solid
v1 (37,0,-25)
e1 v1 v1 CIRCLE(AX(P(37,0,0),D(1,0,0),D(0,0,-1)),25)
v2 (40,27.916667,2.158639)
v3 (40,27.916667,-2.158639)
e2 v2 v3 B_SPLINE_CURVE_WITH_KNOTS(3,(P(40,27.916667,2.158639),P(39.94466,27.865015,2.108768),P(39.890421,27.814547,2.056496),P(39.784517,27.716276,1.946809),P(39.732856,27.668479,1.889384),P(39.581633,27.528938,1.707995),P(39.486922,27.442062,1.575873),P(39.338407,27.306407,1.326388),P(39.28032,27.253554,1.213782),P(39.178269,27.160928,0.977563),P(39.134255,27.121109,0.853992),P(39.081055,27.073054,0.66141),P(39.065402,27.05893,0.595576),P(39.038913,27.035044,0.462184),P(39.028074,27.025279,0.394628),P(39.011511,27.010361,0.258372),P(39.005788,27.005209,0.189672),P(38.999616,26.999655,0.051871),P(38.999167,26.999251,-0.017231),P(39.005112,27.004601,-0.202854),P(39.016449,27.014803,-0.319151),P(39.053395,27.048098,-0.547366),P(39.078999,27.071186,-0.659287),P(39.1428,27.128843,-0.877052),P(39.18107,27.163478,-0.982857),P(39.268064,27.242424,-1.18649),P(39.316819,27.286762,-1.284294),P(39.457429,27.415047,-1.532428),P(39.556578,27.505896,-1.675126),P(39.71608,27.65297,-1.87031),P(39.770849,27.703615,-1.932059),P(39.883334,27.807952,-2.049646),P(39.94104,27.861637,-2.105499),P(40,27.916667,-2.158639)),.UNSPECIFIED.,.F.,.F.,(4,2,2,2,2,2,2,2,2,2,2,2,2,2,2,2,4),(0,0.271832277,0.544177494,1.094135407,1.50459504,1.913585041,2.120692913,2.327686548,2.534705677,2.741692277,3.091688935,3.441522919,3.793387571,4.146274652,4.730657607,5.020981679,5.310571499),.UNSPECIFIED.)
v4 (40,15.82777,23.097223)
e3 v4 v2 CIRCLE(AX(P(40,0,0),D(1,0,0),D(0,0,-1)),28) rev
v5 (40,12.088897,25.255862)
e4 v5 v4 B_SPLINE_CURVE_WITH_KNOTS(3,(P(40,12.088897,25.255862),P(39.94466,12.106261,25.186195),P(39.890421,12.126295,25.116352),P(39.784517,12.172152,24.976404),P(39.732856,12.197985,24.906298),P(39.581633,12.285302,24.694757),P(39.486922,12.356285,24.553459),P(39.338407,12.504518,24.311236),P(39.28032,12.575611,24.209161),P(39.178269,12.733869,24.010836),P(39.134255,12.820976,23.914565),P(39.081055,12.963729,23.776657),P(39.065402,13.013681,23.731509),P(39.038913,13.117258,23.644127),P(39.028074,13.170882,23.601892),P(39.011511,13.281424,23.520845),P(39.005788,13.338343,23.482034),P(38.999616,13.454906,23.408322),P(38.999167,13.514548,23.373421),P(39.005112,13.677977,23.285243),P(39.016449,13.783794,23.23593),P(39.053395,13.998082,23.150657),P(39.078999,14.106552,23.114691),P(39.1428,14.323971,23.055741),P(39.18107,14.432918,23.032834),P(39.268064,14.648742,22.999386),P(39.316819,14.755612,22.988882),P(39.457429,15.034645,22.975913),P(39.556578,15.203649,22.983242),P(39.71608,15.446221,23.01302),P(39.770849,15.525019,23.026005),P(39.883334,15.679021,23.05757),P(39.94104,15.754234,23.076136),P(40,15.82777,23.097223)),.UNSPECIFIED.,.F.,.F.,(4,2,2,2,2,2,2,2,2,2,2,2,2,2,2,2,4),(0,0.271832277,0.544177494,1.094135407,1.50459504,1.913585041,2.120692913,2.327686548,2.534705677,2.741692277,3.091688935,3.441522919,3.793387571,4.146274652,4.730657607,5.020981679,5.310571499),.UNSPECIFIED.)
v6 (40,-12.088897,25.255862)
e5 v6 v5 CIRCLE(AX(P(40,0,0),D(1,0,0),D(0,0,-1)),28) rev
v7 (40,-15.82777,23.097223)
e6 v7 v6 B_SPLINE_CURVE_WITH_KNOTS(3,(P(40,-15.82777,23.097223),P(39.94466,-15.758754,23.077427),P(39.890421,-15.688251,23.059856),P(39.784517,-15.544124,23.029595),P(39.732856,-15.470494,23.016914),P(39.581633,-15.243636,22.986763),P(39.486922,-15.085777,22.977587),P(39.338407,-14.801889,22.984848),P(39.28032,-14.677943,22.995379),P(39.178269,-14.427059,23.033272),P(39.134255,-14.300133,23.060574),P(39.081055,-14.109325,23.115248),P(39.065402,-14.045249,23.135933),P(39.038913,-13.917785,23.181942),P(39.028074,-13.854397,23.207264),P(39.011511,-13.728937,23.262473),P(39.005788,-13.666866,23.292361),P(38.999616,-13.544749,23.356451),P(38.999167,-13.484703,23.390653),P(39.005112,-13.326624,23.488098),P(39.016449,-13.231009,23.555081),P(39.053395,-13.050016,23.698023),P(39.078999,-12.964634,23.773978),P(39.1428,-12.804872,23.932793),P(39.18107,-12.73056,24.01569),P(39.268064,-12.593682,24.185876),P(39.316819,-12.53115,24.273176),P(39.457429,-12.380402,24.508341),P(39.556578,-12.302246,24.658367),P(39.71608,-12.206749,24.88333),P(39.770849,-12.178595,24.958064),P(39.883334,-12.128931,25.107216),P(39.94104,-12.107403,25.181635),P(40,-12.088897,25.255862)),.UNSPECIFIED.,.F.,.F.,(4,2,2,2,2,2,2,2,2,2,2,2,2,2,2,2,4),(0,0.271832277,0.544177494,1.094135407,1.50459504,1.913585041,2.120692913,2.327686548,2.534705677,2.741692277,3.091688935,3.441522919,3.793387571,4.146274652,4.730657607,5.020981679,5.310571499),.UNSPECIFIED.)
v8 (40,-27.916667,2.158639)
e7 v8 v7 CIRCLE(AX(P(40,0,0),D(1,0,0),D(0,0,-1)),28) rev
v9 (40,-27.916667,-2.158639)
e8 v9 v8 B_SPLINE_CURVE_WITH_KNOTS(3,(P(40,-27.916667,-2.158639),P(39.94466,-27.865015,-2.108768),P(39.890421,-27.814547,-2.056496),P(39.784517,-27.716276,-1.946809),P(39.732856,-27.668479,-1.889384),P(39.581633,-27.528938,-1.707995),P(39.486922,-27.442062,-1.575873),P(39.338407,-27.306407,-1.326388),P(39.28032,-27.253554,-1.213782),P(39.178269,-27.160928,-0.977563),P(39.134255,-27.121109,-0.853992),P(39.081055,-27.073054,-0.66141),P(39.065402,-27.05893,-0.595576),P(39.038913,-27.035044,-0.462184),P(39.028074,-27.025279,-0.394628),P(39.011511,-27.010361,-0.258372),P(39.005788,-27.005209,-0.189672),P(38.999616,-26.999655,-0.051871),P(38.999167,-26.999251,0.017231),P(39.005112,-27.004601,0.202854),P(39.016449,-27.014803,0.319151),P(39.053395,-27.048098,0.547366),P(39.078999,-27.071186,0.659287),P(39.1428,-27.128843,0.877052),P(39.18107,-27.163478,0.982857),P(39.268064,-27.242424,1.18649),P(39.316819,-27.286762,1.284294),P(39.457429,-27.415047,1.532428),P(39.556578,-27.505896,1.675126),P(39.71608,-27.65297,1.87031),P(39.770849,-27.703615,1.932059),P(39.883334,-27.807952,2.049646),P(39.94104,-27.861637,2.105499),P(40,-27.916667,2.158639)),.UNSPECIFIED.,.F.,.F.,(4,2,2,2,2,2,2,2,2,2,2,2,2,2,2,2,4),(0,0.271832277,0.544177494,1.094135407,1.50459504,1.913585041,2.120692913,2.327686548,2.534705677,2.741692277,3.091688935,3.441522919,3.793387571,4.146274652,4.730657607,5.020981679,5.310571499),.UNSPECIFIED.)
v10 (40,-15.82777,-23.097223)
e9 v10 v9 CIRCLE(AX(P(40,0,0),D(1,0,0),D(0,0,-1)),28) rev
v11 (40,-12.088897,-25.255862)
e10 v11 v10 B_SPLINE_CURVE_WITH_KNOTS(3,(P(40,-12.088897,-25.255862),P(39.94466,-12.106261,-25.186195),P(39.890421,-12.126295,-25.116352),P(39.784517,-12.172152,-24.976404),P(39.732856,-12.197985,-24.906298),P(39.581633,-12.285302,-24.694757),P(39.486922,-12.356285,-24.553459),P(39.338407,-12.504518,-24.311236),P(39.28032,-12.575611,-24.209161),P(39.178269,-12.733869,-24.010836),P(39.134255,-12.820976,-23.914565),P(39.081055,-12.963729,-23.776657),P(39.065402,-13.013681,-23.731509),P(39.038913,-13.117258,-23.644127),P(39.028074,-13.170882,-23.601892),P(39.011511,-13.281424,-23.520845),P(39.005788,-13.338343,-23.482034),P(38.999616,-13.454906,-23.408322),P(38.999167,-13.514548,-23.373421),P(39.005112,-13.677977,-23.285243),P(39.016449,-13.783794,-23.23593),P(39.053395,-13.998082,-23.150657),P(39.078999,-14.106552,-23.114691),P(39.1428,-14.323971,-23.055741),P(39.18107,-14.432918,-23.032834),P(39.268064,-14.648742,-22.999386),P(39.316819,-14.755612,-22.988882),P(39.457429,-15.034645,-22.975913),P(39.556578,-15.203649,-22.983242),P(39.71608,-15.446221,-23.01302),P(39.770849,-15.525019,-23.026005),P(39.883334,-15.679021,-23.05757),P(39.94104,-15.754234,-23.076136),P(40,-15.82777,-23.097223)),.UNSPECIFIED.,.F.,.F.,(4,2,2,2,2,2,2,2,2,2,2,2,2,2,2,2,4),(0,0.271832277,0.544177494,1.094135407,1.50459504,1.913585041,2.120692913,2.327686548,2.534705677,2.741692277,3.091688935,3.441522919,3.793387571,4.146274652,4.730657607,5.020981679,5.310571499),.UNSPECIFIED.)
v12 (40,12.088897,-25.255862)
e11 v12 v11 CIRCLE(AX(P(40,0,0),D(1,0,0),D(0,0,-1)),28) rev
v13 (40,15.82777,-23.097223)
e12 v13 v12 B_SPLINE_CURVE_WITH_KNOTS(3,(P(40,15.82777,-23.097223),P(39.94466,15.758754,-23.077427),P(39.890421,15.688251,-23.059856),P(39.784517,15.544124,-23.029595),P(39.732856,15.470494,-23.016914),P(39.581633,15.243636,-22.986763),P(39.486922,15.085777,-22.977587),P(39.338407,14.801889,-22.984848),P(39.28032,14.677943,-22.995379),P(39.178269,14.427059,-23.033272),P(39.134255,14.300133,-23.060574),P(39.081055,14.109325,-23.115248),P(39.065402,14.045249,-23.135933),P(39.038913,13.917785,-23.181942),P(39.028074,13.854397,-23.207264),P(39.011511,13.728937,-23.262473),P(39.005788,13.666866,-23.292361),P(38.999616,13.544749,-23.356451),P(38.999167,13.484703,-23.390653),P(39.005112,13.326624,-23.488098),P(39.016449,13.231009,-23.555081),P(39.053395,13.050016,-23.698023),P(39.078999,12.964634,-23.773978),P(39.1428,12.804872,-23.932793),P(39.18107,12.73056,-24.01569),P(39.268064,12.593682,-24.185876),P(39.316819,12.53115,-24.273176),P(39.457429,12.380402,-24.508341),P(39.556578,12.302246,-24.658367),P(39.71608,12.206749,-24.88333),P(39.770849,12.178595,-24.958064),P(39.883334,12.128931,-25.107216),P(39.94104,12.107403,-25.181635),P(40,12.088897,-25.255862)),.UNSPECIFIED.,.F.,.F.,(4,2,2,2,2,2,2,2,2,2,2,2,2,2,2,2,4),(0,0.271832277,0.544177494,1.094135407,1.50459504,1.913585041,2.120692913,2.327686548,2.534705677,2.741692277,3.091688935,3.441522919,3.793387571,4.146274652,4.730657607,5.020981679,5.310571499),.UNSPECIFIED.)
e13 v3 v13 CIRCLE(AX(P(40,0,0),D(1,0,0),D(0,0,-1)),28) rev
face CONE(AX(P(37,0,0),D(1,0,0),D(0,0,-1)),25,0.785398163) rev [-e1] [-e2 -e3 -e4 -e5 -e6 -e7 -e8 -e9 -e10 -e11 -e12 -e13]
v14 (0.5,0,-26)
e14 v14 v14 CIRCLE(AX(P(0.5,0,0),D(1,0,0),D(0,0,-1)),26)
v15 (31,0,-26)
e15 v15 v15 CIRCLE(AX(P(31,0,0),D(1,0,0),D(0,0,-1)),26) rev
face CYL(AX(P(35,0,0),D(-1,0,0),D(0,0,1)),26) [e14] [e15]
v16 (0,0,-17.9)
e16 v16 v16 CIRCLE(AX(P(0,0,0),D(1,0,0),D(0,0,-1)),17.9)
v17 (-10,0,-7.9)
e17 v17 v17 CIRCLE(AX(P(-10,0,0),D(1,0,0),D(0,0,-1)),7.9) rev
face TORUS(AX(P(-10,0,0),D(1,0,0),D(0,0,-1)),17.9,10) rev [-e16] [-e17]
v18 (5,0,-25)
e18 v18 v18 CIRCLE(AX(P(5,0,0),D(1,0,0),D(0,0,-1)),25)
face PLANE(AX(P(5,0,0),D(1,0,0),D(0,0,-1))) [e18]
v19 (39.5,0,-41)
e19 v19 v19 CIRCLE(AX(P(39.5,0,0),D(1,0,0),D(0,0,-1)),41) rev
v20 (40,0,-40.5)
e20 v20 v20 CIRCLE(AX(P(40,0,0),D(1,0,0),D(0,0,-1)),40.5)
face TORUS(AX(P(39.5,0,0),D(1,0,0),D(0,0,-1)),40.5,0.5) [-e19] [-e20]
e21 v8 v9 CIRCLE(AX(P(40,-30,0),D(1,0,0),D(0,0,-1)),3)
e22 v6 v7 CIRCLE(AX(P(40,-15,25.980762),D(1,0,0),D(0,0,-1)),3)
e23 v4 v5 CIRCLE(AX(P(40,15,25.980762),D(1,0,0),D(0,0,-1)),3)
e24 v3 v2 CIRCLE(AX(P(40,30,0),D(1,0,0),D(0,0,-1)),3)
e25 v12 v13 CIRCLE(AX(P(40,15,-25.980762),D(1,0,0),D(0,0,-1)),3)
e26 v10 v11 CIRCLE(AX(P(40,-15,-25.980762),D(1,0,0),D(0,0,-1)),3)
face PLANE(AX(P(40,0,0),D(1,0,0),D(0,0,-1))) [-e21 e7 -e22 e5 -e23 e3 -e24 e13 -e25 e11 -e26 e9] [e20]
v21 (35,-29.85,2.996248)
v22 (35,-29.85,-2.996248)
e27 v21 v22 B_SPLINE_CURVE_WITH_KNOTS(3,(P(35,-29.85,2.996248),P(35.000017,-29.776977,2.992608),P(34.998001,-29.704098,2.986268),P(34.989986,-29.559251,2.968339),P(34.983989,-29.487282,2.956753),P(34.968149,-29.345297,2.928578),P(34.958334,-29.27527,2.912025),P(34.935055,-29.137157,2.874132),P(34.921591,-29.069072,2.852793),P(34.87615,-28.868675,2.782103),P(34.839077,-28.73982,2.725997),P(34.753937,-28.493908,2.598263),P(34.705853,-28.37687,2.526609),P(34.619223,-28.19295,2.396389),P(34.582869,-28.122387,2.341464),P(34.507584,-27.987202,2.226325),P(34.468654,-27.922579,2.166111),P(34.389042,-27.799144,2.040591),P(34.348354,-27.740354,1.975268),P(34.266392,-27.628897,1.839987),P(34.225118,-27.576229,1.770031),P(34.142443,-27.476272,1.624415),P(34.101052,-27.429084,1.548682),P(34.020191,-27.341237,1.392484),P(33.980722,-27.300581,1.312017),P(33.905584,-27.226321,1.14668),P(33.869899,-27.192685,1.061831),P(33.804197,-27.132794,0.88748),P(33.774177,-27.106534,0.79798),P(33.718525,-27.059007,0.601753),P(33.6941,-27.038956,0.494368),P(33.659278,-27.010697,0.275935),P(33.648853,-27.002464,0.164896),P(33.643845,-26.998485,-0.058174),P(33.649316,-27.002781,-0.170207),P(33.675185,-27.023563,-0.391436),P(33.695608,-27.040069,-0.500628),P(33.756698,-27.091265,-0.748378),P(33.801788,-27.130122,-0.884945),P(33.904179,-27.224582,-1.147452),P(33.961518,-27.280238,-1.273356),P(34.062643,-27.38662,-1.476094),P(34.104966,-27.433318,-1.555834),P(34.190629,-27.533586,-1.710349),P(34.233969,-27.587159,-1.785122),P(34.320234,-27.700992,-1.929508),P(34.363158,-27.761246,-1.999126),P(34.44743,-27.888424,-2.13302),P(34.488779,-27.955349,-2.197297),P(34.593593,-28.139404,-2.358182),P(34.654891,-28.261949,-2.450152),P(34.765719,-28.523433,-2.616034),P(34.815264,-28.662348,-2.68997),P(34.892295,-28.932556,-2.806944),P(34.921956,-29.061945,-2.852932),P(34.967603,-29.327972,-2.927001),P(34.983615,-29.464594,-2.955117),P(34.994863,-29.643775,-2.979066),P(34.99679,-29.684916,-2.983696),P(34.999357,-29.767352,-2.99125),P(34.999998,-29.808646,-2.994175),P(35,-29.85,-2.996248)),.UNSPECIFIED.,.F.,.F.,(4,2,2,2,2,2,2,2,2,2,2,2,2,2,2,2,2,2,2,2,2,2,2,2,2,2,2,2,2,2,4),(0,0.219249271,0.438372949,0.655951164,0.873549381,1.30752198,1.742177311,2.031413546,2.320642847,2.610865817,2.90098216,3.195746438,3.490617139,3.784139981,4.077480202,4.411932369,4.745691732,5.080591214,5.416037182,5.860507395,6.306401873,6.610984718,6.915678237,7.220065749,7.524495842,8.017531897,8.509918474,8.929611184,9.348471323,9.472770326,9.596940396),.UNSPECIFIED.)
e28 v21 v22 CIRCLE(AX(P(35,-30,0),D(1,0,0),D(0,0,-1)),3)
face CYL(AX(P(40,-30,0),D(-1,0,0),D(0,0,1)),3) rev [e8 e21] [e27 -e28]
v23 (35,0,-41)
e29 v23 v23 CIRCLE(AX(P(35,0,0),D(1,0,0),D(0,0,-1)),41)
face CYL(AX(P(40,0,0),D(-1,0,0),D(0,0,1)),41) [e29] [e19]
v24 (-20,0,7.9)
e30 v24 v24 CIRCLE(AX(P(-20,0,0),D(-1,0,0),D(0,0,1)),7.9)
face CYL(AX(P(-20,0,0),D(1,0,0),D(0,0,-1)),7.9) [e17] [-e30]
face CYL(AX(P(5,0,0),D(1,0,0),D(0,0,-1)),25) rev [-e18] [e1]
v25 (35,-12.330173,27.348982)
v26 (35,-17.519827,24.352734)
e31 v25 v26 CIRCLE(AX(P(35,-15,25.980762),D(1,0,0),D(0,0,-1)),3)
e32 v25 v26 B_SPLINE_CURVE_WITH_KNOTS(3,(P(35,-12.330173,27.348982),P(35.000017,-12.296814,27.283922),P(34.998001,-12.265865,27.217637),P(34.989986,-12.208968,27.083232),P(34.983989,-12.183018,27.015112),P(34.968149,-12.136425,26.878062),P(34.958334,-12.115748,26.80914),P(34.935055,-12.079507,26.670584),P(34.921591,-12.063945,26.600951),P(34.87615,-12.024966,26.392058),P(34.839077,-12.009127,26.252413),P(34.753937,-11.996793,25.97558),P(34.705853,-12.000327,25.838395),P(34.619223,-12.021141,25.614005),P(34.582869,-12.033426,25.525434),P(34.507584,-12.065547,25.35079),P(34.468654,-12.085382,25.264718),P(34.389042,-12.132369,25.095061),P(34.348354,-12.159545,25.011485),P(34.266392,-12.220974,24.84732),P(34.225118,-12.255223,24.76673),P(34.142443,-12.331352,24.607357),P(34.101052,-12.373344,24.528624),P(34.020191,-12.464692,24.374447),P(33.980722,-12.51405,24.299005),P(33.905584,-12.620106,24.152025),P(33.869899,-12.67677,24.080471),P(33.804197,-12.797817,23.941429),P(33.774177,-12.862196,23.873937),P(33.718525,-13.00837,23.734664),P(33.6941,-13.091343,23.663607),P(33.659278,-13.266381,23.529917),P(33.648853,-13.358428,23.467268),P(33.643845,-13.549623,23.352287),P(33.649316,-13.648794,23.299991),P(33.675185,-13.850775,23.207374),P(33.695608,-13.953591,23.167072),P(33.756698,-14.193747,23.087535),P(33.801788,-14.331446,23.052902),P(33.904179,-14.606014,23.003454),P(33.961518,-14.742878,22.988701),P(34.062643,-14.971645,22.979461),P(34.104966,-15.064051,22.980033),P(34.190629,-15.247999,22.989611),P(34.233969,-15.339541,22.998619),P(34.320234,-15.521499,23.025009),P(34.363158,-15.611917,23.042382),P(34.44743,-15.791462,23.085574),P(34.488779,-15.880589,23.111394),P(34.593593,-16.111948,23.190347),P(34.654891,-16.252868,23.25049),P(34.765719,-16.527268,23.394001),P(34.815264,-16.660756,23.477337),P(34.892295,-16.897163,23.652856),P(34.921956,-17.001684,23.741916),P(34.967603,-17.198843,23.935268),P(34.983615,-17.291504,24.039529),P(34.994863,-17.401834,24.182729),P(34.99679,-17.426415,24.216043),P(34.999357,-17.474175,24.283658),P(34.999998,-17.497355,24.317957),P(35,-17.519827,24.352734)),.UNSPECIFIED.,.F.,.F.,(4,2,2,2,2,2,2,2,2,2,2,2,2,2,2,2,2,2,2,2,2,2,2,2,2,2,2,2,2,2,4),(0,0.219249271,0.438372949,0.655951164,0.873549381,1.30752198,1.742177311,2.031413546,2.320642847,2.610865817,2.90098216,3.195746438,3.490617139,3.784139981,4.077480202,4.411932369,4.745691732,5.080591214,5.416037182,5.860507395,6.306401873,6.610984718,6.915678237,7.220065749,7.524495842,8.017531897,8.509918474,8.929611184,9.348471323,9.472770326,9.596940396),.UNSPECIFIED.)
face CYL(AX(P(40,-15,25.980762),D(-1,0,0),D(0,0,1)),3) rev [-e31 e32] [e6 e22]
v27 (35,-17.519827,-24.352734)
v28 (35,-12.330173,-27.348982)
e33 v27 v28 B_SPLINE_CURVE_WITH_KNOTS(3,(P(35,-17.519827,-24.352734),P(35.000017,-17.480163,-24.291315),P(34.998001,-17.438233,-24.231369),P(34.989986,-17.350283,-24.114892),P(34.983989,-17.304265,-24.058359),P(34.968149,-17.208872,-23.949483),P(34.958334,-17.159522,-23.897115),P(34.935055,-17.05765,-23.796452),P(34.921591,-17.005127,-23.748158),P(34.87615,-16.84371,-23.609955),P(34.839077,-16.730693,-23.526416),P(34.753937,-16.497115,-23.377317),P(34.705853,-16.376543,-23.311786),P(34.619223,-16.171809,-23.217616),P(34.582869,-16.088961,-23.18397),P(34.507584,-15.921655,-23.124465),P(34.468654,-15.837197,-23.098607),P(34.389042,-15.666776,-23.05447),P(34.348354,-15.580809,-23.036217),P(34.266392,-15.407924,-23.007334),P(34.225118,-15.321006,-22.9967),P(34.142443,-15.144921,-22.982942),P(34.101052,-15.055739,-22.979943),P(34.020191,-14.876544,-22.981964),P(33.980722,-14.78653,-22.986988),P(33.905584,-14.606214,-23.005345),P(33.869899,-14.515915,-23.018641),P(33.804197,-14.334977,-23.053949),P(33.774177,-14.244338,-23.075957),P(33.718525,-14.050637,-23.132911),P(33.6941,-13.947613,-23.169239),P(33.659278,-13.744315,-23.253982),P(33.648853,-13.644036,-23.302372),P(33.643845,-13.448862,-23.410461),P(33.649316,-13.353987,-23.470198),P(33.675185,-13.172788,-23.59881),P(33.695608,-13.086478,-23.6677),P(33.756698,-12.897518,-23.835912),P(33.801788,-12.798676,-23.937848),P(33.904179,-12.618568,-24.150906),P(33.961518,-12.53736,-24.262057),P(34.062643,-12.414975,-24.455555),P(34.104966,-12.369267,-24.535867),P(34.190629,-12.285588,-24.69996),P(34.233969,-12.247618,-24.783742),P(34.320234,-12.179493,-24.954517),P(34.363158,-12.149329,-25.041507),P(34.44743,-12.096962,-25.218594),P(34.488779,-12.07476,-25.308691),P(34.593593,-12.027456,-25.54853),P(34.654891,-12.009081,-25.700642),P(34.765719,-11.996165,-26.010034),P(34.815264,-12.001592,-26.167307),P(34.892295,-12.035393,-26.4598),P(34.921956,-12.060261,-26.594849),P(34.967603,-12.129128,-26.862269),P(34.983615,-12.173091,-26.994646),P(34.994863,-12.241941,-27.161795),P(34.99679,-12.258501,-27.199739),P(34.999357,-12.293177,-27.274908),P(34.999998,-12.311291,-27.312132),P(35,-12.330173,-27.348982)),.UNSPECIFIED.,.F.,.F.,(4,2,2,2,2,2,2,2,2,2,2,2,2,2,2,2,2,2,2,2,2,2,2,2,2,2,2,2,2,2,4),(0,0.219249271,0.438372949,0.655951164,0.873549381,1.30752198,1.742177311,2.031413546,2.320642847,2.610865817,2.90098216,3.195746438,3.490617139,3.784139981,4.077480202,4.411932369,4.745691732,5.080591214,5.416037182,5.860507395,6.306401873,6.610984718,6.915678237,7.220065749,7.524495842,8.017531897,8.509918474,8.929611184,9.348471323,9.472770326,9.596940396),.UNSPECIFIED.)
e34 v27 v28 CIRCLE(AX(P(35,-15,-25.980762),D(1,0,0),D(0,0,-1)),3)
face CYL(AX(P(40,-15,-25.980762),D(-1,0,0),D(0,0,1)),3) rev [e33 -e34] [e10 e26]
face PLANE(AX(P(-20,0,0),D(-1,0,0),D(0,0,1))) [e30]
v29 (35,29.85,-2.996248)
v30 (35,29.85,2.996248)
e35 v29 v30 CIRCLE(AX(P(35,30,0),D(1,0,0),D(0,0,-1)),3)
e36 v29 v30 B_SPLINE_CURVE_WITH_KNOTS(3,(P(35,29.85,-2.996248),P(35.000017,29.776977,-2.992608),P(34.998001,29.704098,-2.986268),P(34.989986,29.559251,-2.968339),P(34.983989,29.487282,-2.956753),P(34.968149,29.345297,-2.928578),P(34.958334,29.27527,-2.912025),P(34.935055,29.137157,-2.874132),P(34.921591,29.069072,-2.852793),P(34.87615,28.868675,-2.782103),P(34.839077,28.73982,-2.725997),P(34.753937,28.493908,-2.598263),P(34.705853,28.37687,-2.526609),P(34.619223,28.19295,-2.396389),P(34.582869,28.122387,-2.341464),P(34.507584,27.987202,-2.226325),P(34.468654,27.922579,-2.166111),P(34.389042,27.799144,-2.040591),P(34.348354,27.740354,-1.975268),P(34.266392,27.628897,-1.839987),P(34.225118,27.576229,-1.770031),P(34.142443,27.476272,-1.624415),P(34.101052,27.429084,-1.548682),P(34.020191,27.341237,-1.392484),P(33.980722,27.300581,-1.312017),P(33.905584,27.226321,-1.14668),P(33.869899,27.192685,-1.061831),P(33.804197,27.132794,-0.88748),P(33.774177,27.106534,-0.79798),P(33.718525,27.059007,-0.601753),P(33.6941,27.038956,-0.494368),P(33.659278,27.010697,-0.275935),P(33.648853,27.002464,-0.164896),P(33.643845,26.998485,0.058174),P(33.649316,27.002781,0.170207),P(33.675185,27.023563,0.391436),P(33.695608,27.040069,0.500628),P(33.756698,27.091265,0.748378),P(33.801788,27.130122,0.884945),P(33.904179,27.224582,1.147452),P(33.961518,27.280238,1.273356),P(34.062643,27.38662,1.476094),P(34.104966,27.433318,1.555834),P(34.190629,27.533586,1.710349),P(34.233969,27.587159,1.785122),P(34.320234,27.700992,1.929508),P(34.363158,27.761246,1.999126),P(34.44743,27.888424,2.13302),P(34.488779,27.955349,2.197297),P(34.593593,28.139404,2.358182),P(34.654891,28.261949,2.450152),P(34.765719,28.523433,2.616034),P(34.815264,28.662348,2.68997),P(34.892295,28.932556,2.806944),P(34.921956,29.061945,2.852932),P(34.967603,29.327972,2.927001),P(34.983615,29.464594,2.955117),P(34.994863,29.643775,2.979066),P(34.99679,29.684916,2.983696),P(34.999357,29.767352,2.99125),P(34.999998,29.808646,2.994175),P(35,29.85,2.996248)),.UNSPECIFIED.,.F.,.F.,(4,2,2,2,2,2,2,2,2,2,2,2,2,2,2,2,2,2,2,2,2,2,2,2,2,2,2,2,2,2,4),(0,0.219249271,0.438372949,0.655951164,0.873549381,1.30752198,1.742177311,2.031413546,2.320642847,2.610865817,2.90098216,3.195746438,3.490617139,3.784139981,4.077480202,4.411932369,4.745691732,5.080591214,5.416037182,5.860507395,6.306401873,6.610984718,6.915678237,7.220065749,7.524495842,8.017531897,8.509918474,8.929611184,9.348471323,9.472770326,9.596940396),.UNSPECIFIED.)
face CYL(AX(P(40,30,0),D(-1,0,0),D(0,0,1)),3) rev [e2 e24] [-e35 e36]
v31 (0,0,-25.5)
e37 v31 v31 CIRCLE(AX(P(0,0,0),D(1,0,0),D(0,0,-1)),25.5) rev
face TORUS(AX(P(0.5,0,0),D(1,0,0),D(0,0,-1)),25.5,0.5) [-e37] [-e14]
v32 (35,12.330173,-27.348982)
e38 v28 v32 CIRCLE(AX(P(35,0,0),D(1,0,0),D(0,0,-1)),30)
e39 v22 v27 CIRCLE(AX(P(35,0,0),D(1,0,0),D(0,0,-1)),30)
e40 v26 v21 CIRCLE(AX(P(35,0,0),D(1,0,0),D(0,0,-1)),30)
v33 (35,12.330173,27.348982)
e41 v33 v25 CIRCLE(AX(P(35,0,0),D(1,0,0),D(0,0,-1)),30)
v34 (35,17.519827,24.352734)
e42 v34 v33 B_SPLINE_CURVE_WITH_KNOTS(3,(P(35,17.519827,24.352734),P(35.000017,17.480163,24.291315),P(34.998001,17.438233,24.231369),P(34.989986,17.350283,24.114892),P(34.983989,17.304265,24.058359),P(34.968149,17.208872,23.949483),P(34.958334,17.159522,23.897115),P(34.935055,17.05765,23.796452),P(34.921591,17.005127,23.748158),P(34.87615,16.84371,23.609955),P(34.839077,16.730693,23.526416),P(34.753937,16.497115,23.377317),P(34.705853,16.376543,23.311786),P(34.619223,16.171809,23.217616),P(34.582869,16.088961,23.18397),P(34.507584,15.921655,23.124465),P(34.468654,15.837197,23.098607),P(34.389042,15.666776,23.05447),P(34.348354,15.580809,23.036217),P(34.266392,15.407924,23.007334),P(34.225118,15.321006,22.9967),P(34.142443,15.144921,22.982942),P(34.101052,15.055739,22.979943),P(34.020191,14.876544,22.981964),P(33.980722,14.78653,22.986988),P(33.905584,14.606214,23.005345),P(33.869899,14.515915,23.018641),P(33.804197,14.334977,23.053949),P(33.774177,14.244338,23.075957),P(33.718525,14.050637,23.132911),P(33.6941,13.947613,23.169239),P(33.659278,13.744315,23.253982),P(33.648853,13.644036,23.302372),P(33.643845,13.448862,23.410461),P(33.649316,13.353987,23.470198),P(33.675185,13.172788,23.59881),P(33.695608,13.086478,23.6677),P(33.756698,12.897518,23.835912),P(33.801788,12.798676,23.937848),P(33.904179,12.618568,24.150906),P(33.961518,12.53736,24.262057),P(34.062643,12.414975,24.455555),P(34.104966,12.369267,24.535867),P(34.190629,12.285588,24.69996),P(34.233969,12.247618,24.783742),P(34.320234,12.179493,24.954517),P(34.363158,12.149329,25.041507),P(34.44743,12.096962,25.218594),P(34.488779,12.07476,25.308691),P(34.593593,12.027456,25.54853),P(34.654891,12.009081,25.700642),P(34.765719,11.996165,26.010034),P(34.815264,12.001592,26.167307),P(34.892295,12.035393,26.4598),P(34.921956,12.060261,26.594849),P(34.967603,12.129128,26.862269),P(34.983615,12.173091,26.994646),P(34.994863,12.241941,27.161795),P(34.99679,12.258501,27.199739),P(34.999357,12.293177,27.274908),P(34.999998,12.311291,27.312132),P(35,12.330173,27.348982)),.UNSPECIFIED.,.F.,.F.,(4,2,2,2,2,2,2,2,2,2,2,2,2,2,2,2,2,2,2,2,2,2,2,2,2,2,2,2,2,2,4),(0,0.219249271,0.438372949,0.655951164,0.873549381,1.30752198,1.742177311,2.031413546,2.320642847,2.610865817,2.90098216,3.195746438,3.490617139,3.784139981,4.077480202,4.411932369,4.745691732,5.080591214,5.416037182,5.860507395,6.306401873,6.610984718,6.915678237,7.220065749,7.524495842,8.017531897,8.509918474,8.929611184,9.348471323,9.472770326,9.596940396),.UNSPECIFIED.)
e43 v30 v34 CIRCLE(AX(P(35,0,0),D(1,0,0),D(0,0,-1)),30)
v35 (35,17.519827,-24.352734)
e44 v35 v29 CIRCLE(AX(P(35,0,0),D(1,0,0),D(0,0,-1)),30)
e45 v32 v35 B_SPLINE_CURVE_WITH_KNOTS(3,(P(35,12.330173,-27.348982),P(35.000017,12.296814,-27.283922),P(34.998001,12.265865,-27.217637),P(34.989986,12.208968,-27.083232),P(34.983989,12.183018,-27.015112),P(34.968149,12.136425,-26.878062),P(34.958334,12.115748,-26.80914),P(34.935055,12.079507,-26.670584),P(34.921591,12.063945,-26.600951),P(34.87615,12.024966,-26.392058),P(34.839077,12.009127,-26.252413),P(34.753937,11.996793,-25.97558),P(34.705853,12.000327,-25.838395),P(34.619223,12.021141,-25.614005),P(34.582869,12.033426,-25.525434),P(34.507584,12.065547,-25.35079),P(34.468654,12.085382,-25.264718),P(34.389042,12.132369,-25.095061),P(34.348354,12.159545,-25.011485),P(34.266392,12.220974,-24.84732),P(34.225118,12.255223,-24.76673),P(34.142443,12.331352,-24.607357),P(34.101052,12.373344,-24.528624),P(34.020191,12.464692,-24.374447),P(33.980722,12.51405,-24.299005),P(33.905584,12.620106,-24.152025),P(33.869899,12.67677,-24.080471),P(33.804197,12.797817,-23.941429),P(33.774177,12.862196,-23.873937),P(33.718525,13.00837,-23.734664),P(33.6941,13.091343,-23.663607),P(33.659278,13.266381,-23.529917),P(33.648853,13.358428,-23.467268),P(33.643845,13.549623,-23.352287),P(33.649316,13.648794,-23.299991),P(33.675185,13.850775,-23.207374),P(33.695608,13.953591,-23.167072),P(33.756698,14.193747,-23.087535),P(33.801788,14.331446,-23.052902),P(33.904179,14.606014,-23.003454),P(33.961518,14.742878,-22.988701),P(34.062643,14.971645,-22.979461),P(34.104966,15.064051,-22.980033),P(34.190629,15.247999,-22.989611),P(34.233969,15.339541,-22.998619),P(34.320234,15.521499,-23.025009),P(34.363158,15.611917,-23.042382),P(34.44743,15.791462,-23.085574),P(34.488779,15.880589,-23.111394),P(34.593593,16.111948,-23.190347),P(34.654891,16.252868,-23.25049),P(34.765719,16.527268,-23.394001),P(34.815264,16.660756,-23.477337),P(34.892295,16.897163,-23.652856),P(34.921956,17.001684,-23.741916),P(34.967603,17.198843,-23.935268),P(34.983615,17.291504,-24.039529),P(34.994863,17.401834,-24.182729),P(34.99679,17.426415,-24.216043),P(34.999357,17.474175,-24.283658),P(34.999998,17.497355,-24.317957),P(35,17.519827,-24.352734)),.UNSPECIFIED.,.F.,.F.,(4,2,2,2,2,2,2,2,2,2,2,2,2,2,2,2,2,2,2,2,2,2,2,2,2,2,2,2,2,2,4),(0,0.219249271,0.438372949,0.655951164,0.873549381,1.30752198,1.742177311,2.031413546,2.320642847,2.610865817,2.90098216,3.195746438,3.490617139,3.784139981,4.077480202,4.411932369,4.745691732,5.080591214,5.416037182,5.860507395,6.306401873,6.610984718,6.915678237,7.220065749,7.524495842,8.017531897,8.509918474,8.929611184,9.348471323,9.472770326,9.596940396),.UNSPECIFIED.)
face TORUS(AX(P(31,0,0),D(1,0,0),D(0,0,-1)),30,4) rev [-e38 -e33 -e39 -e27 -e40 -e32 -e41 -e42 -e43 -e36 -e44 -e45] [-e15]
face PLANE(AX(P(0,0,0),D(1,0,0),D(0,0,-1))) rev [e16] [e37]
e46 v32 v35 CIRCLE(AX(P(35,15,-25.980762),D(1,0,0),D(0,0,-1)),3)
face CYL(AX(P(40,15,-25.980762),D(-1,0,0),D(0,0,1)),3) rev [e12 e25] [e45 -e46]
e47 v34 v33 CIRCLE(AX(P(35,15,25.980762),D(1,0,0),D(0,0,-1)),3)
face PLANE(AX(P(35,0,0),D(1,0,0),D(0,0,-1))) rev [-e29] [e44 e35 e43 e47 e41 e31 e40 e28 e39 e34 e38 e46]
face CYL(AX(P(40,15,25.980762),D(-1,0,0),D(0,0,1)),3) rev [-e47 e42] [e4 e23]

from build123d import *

# Parameters (mm, degrees)
SKETCH1_R           = 41
SKETCH1_R_2         = 3
BOSS_EXTRUDE1_DEPTH = 40
SKETCH2_R           = 7.9
BOSS_EXTRUDE2_DEPTH = 20
FILLET1_R           = 10
FILLET2_R           = 0.5
SKETCH3_R           = 57.838297584
SKETCH3_R_2         = 26
CUT_EXTRUDE1_DEPTH  = 35
FILLET3_R           = 4
FILLET4_R           = 0.5
SKETCH5_R           = 25
CUT_EXTRUDE2_DEPTH  = 35
CHAMFER1_SIZE       = 3


with BuildPart() as part:
    # Sketch1 → Boss-Extrude1 (new body)
    with BuildSketch(Plane(origin=(0, 0, 0), x_dir=(0, 0, -1), z_dir=(1, 0, 0))):
        Circle(SKETCH1_R)
        with Locations((0, 30)):
            Circle(SKETCH1_R_2, mode=Mode.SUBTRACT)
        with Locations((25.980762114, 15)):
            Circle(SKETCH1_R_2, mode=Mode.SUBTRACT)
        with Locations((25.980762114, -15)):
            Circle(SKETCH1_R_2, mode=Mode.SUBTRACT)
        with Locations((0, -30)):
            Circle(SKETCH1_R_2, mode=Mode.SUBTRACT)
        with Locations((-25.980762114, -15)):
            Circle(SKETCH1_R_2, mode=Mode.SUBTRACT)
        with Locations((-25.980762114, 15)):
            Circle(SKETCH1_R_2, mode=Mode.SUBTRACT)
    extrude(amount=BOSS_EXTRUDE1_DEPTH)

    # Sketch2 → Boss-Extrude2 (add)
    with BuildSketch(Plane.ZY):
        with Locations(Location((0, 0, 0), (0, 0, 180))):
            Circle(SKETCH2_R)
    extrude(amount=BOSS_EXTRUDE2_DEPTH)

    # Fillet1
    fillet1_edges = [part.edges().sort_by_distance(p)[0] for p in [
        (0, 0, 7.9),
    ]]
    fillet(fillet1_edges, radius=FILLET1_R)

    # Fillet2
    fillet2_edges = [part.edges().sort_by_distance(p)[0] for p in [
        (0, 0, 41),
        (40, 0, 41),
    ]]
    fillet(fillet2_edges, radius=FILLET2_R)

    # Sketch3 → Cut-Extrude1 (cut)
    with BuildSketch(Plane(origin=(0, 0, 0), x_dir=(0, 0, -1), z_dir=(1, 0, 0))):
        Circle(SKETCH3_R)
        Circle(SKETCH3_R_2, mode=Mode.SUBTRACT)
    extrude(amount=CUT_EXTRUDE1_DEPTH, mode=Mode.SUBTRACT)

    # Fillet3
    # the kernel refuses this fillet: 4 mm, written as the material it adds along each edge
    with BuildSketch(Plane(origin=(35, 0, 0), x_dir=(0, 0, -1), z_dir=(0, -1, 0))) as fillet3_piece_1_section:
        with BuildLine():
            CenterArc((26 + FILLET3_R, -FILLET3_R), FILLET3_R, 90, 90)
            Line((26 + FILLET3_R, 0), (26, 0))
            Line((26, 0), (26, -FILLET3_R))
        make_face()
    fillet3_piece_1 = revolve(axis=Axis((35, 0, 0), (1, 0, 0)), mode=Mode.PRIVATE)
    fillet3_piece_1 = fillet3_piece_1 - Plane(origin=(33.889931495, -15, 25.980762114), x_dir=(0, 0, -1), z_dir=(-1, 0, 0)) * Cylinder(3, 120, mode=Mode.PRIVATE)
    fillet3_piece_1 = fillet3_piece_1 - Plane(origin=(33.889931495, -30, 0), x_dir=(0, 0, -1), z_dir=(-1, 0, 0)) * Cylinder(3, 120, mode=Mode.PRIVATE)
    fillet3_piece_1 = fillet3_piece_1 - Plane(origin=(33.889931495, -15, -25.980762114), x_dir=(0, 0, -1), z_dir=(-1, 0, 0)) * Cylinder(3, 120, mode=Mode.PRIVATE)
    fillet3_piece_1 = fillet3_piece_1 - Plane(origin=(33.889931495, 15, 25.980762114), x_dir=(0, 0, -1), z_dir=(-1, 0, 0)) * Cylinder(3, 120, mode=Mode.PRIVATE)
    fillet3_piece_1 = fillet3_piece_1 - Plane(origin=(33.889931495, 15, -25.980762114), x_dir=(0, 0, -1), z_dir=(-1, 0, 0)) * Cylinder(3, 120, mode=Mode.PRIVATE)
    fillet3_piece_1 = fillet3_piece_1 - Plane(origin=(33.889931495, 30, 0), x_dir=(0, 0, -1), z_dir=(-1, 0, 0)) * Cylinder(3, 120, mode=Mode.PRIVATE)
    add(fillet3_piece_1)

    # Fillet4
    fillet4_edges = [part.edges().sort_by_distance(p)[0] for p in [
        (0, 0, 26),
    ]]
    fillet(fillet4_edges, radius=FILLET4_R)

    # Sketch5 → Cut-Extrude2 (cut)
    with BuildSketch(Plane(origin=(40, 0, 0), x_dir=(0, 0, -1), z_dir=(1, 0, 0))):
        Circle(SKETCH5_R)
    extrude(amount=-CUT_EXTRUDE2_DEPTH, mode=Mode.SUBTRACT)

    # Chamfer1
    # the kernel refuses this chamfer: 3 mm, written as the material it takes off along each edge
    with BuildSketch(Plane(origin=(40, 0, 0), x_dir=(0, 0, -1), z_dir=(0, -1, 0))) as chamfer1_piece_1:
        Polygon((25 + CHAMFER1_SIZE, 0), (25, -CHAMFER1_SIZE), (25, 0), align=None)
    revolve(axis=Axis((40, 0, 0), (1, 0, 0)), mode=Mode.SUBTRACT)


solid = part.part
